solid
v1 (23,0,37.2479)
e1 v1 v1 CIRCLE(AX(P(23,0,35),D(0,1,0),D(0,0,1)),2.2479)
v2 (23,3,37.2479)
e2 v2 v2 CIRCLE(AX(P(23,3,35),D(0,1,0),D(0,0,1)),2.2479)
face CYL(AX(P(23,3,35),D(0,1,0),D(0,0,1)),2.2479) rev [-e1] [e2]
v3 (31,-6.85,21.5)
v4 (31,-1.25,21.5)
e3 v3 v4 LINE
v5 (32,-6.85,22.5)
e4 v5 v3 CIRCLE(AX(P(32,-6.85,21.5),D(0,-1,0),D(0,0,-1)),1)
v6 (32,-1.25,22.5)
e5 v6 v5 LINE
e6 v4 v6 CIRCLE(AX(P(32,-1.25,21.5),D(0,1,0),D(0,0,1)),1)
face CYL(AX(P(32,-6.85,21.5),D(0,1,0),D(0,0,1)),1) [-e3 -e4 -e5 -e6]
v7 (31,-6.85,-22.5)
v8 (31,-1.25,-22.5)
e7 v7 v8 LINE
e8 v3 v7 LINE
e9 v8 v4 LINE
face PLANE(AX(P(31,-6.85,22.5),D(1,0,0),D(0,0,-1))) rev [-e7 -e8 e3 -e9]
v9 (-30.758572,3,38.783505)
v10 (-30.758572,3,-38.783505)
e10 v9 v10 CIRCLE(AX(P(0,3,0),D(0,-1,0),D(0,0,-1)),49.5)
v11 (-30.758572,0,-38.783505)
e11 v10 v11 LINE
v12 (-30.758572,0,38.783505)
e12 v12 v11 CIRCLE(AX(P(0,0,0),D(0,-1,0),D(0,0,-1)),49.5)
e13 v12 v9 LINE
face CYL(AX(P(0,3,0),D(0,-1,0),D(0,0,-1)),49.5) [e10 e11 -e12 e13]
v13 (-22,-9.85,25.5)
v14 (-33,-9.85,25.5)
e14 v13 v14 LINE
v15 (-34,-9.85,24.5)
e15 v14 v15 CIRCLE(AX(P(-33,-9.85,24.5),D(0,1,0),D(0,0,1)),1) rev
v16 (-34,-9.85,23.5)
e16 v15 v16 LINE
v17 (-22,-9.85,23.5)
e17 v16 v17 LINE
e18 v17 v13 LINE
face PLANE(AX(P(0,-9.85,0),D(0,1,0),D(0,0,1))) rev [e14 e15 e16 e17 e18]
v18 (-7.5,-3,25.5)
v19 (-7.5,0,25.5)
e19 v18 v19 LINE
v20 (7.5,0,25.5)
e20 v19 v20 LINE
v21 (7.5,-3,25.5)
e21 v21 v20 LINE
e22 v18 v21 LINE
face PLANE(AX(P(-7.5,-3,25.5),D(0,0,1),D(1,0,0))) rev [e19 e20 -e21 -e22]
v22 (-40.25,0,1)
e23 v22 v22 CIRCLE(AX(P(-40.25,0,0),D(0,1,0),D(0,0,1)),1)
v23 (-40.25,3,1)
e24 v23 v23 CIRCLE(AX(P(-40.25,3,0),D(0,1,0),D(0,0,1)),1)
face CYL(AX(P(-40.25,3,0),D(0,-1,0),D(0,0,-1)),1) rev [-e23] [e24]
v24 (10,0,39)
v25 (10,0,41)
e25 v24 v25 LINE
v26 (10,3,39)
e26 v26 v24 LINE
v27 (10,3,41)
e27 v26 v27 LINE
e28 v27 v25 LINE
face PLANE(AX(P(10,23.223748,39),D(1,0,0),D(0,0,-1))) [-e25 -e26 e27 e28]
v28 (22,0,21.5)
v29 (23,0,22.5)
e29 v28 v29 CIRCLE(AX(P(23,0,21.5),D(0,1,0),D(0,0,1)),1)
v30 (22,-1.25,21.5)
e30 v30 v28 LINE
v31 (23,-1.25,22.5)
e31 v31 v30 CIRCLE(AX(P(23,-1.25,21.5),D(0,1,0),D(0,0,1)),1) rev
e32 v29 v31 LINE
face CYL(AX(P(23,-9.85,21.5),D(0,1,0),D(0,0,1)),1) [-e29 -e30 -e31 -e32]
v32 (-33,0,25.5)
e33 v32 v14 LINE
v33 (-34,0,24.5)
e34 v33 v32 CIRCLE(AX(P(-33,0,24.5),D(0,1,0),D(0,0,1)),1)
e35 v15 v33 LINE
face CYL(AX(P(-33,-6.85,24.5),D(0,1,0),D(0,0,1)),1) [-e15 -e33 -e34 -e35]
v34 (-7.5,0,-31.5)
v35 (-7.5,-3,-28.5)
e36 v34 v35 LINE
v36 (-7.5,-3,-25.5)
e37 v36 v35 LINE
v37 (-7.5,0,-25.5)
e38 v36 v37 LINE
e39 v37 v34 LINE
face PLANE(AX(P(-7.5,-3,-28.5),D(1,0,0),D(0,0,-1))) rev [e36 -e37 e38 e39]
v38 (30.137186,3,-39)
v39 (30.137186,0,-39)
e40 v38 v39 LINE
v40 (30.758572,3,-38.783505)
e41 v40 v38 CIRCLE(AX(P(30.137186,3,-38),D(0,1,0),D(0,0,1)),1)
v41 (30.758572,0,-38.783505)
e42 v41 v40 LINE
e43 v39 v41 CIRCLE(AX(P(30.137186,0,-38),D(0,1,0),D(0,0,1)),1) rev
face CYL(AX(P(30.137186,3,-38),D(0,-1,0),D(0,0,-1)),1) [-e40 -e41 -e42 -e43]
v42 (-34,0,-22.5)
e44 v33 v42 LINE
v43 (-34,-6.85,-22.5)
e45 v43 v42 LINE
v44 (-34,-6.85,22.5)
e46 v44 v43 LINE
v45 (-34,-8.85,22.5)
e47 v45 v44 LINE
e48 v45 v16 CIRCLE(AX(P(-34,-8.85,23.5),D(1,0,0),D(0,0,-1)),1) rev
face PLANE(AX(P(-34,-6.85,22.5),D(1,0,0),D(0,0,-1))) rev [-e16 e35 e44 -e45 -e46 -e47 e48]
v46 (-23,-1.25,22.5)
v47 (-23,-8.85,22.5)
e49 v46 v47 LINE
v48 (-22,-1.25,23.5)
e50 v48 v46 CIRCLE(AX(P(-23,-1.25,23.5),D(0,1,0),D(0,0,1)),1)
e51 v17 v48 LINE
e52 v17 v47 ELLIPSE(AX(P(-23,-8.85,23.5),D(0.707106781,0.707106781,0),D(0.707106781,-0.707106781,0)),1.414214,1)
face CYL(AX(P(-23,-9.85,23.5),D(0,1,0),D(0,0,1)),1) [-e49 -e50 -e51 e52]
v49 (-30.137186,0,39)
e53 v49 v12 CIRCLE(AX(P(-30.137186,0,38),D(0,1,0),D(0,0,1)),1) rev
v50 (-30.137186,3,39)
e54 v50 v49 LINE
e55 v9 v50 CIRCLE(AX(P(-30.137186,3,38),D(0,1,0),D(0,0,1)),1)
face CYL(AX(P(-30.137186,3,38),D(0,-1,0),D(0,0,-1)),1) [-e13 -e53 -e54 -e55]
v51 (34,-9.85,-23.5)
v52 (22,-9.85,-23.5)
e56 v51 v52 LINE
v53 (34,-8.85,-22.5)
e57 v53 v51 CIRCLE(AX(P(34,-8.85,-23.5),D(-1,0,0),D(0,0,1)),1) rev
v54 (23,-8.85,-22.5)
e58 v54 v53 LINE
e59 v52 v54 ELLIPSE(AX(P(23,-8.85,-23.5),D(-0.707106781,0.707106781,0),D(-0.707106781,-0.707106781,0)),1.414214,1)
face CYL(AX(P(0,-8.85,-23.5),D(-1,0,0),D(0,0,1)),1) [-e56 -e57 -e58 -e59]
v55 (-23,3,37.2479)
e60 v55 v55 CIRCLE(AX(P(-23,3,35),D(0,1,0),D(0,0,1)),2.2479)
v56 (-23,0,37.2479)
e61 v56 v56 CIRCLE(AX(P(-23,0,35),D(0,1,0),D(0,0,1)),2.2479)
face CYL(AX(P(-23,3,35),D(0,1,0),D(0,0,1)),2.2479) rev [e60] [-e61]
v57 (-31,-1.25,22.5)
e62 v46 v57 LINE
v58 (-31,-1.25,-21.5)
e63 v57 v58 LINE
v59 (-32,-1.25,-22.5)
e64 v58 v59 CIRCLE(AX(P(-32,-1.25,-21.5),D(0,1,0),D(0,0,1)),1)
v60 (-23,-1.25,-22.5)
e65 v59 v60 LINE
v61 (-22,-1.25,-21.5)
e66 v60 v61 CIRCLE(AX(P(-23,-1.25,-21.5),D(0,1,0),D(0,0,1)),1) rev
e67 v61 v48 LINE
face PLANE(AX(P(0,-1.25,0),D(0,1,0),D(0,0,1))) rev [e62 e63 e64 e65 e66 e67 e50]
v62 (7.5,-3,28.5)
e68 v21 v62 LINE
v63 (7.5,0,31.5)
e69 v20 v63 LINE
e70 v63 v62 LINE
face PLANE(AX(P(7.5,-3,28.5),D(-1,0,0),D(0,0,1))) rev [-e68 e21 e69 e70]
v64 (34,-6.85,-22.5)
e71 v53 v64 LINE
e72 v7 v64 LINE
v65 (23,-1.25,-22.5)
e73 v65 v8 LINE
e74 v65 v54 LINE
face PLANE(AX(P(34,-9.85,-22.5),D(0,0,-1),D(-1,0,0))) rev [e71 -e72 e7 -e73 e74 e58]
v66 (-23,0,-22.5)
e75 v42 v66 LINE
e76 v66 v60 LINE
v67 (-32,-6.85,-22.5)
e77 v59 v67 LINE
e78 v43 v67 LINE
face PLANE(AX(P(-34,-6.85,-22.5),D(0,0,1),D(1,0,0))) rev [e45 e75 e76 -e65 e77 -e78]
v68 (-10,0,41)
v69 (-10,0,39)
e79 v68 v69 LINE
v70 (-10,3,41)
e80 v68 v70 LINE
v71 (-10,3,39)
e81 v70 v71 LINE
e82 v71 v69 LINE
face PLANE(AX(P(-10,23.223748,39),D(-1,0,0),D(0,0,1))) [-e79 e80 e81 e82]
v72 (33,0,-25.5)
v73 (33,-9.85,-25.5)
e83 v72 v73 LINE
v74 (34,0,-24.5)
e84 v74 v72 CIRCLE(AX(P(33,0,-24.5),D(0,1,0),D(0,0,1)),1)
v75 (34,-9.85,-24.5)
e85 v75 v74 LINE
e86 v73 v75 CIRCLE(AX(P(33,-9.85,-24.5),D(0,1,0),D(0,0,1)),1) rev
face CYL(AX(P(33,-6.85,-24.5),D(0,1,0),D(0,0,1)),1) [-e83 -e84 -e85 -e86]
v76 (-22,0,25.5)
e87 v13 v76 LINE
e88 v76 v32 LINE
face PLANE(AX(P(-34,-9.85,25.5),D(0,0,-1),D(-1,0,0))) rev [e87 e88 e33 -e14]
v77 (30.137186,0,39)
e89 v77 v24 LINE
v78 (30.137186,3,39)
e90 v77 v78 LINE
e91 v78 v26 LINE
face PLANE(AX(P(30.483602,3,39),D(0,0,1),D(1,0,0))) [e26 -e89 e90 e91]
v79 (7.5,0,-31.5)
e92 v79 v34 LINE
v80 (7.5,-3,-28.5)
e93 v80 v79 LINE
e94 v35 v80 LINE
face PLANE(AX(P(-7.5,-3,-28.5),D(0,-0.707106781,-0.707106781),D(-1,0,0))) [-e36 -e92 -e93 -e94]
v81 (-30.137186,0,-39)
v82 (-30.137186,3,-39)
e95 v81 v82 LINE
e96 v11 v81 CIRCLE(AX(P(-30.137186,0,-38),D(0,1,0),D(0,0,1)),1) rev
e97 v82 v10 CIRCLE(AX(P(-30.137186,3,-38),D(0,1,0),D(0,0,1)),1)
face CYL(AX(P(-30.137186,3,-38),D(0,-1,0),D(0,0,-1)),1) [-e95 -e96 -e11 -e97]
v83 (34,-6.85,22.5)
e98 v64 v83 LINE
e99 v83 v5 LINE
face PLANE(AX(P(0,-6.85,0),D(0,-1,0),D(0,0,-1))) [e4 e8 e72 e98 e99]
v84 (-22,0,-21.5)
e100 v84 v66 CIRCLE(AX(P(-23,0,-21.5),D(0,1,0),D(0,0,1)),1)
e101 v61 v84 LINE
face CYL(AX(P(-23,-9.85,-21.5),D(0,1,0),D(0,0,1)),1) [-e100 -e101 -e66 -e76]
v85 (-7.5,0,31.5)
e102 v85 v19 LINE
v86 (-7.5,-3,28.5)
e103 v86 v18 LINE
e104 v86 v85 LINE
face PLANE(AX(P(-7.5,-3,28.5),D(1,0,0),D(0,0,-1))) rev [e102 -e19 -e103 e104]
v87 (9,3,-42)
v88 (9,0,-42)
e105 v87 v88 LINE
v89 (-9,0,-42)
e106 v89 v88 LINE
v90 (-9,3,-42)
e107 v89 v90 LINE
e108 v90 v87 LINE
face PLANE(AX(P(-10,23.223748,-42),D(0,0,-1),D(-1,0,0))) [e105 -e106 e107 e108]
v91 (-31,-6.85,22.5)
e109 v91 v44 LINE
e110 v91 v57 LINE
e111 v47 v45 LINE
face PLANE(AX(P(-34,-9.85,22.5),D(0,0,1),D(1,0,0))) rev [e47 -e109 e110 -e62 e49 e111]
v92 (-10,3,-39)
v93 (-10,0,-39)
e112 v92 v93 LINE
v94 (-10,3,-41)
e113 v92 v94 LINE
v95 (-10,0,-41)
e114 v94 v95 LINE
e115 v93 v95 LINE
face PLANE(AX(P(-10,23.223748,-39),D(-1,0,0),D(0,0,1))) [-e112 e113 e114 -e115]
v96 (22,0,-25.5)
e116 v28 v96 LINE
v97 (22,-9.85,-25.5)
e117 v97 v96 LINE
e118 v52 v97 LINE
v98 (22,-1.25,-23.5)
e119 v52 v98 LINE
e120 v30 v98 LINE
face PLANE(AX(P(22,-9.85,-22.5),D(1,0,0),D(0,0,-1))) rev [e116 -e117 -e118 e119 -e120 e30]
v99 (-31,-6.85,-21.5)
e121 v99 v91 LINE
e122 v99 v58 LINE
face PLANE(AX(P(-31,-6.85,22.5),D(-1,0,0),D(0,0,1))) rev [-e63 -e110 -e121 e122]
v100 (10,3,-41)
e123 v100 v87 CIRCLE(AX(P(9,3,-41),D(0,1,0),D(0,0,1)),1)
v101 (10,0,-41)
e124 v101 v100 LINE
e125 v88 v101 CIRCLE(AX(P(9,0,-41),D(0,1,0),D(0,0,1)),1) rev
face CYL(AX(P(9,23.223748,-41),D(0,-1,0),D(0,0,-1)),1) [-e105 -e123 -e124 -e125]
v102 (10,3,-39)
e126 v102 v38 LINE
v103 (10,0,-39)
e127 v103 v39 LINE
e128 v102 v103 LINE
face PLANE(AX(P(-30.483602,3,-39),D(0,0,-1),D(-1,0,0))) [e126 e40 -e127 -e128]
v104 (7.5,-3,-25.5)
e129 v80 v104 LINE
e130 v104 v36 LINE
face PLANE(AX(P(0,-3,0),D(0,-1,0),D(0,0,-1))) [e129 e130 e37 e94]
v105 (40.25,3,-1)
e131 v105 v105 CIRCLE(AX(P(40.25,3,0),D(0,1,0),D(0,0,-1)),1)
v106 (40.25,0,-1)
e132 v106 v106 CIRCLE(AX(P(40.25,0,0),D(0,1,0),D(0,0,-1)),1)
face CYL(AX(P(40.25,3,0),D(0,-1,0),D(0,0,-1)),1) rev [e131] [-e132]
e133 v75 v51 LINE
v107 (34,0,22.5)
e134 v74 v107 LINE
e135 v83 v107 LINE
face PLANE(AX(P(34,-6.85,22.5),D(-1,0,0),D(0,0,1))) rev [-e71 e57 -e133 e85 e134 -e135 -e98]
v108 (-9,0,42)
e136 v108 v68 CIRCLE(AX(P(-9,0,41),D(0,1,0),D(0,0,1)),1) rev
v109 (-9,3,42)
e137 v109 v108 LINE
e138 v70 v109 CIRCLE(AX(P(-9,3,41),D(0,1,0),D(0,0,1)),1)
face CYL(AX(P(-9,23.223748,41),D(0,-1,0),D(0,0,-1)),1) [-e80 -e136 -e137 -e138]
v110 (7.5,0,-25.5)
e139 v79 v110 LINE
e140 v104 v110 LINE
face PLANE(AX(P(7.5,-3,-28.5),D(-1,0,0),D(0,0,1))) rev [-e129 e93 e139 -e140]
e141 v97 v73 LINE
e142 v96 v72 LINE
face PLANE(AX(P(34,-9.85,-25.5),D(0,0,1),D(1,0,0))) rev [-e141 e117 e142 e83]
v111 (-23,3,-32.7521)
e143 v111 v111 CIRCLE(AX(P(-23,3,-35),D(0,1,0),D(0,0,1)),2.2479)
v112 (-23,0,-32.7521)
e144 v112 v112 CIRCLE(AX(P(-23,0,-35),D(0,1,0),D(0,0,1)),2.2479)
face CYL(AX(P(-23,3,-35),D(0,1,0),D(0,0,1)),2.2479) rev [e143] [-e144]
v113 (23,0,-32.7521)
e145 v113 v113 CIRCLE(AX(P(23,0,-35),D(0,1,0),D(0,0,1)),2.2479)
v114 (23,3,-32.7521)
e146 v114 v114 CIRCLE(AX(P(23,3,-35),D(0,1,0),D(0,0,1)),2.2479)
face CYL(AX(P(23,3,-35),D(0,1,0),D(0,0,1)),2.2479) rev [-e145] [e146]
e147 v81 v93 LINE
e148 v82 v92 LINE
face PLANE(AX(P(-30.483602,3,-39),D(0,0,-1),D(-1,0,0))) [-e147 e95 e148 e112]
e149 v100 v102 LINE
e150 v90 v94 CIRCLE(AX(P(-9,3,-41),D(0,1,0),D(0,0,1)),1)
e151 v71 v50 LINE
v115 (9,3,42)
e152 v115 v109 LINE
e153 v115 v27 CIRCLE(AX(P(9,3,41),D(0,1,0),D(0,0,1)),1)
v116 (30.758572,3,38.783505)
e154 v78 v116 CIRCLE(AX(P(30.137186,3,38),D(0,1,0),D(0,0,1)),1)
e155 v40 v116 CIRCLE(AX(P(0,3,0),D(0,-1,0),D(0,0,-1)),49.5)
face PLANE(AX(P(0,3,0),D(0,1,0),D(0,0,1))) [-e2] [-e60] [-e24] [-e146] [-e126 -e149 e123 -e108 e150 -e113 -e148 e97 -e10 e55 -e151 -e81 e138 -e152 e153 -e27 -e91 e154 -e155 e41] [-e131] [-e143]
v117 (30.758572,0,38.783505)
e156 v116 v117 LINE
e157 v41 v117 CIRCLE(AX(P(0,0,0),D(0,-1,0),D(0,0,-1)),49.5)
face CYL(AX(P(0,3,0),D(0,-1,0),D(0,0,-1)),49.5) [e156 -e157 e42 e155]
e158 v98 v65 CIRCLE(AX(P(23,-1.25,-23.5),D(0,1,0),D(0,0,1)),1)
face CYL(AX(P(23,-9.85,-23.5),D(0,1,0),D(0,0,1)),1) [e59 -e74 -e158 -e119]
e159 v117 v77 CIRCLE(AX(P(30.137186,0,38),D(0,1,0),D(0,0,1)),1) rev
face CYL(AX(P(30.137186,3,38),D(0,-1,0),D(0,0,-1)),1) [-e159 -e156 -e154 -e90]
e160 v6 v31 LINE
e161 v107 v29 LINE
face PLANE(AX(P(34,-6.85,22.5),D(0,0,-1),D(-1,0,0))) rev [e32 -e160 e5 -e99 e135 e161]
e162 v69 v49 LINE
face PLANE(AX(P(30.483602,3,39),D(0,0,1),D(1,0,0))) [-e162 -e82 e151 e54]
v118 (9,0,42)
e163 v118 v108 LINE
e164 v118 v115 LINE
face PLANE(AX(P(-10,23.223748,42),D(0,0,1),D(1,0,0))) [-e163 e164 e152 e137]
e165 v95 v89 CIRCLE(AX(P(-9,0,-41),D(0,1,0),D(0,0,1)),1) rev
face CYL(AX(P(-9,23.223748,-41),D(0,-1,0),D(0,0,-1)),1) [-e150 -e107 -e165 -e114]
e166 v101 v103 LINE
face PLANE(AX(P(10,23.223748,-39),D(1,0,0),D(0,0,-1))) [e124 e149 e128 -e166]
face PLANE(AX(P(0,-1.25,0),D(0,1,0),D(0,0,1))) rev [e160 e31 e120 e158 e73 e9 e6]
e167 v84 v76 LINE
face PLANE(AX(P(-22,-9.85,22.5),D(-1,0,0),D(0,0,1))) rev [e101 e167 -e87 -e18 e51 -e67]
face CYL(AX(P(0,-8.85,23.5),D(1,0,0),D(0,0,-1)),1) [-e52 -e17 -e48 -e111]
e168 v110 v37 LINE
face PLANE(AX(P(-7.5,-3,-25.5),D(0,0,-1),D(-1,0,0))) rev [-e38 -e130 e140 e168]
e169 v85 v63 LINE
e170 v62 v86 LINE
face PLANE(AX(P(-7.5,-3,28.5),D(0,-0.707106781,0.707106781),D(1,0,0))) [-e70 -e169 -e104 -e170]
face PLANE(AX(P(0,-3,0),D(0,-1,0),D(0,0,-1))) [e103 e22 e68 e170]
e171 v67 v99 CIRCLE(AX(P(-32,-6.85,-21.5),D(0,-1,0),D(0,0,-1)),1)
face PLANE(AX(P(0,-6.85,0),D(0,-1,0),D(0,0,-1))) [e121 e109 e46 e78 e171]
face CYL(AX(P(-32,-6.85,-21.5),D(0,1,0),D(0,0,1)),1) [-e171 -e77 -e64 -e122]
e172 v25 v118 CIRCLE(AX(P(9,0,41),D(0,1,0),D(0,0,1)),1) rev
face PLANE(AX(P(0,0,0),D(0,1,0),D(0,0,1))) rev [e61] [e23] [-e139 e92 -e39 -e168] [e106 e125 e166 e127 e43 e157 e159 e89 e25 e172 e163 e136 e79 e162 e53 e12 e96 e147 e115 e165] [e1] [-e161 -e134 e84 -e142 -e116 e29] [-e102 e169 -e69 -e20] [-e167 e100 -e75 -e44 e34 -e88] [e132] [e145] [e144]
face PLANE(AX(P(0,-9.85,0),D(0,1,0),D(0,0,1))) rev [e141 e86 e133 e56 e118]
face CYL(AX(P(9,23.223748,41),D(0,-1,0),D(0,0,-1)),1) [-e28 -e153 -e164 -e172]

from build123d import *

# Parameters (mm, degrees)
A_BASE_T42_OUTLINE_R              = 2.2479
A_BASE_T42_OUTLINE_R_2            = 1
A_BASE_T42_DEPTH                  = 3
OUTER_RIM_CUT_DEPTH               = 68.299702823
SKETCH2_W                         = 20
SKETCH2_H                         = 3
FLANGES_DEPTH                     = 3
CONTOURING_R                      = 1
SKETCH3_W                         = 15
SKETCH3_H                         = 3
BASE_SUPPORTS_DEPTH               = 3
BASE_SUPPORTS_CHAMFER_SIZE        = 3
SKETCH4_W                         = 3
SKETCH4_H                         = 45
DYNAMIXEL_SIDE_SUPPORTS_DEPTH     = 6.85
SKETCH5_W                         = 12
SKETCH5_H                         = 3
DYNAMIXEL_SIDE_SUPPORT_ENDS_DEPTH = 9.85
SKETCH8_W                         = 9
SKETCH8_H                         = 45
DYNAMIXEL_OFFSET_DEPTH            = 1.25
DYNAMIXEL_CONTOURING_R            = 1


# Read off the part's stored shape, not the designer's step: a_base_t42
with BuildPart() as part:
    # a_base_t42 outline → a_base_t42 (new body)
    with BuildSketch(Plane(origin=(0, 0, 0), x_dir=(1, 0, 0), z_dir=(0, 1, 0))):
        with BuildLine():
            ThreePointArc((31.5, -42), (52.5, 0), (31.5, 42))
            Line((31.5, 42), (-31.5, 42))
            ThreePointArc((-31.5, 42), (-52.5, 0), (-31.5, -42))
            Line((-31.5, -42), (31.5, -42))
        make_face()
        with Locations((-23, -35)):
            Circle(A_BASE_T42_OUTLINE_R, mode=Mode.SUBTRACT)
        with Locations((23, -35)):
            Circle(A_BASE_T42_OUTLINE_R, mode=Mode.SUBTRACT)
        with Locations((-40.25, 0)):
            Circle(A_BASE_T42_OUTLINE_R_2, mode=Mode.SUBTRACT)
        with Locations((-23, 35)):
            Circle(A_BASE_T42_OUTLINE_R, mode=Mode.SUBTRACT)
        with Locations((40.25, 0)):
            Circle(A_BASE_T42_OUTLINE_R_2, mode=Mode.SUBTRACT)
        with Locations((23, 35)):
            Circle(A_BASE_T42_OUTLINE_R, mode=Mode.SUBTRACT)
    extrude(amount=A_BASE_T42_DEPTH)

    # Sketch1 → Outer Rim Cut (cut, through all)
    with BuildSketch(Plane.XZ):
        with BuildLine():
            Line((31.5, 42), (-31.5, 42))
            ThreePointArc((-31.5, 42), (-52.5, 0), (-31.5, -42))
            Line((-31.5, -42), (31.5, -42))
            ThreePointArc((31.5, -42), (52.5, 0), (31.5, 42))
        make_face()
        with BuildLine():
            Line((30.483602149, 39), (-30.483602149, 39))
            ThreePointArc((-30.483602149, 39), (-49.5, 0), (-30.483602149, -39))
            Line((-30.483602149, -39), (30.483602149, -39))
            ThreePointArc((30.483602149, -39), (49.5, 0), (30.483602149, 39))
        make_face(mode=Mode.SUBTRACT)
    extrude(amount=-OUTER_RIM_CUT_DEPTH, mode=Mode.SUBTRACT)

    # Sketch2 → Flanges (add)
    with BuildSketch(Plane.XZ):
        with Locations((0, -40.5)):
            Rectangle(SKETCH2_W, SKETCH2_H)
        with Locations((0, 40.5)):
            Rectangle(SKETCH2_W, SKETCH2_H)
    extrude(amount=-FLANGES_DEPTH)

    # Contouring
    contouring_edges = [part.edges().sort_by_distance(p)[0] for p in [
        (30.483602149, 1.5, -39),
        (-30.483602149, 1.5, -39),
        (10, 1.5, -42),
        (-10, 1.5, -42),
        (30.483602149, 1.5, 39),
        (-30.483602149, 1.5, 39),
        (10, 1.5, 42),
        (-10, 1.5, 42),
    ]]
    fillet(contouring_edges, radius=CONTOURING_R)

    # Sketch3 → Base Supports (add)
    with BuildSketch(Plane.XZ):
        with Locations((0, -27)):
            Rectangle(SKETCH3_W, SKETCH3_H)
        with Locations((0, 27)):
            Rectangle(SKETCH3_W, SKETCH3_H)
    extrude(amount=BASE_SUPPORTS_DEPTH)

    # Base Supports Chamfer
    base_supports_chamfer_edges = [part.edges().sort_by_distance(p)[0] for p in [
        (0, 0, 28.5),
        (0, 0, -28.5),
    ]]
    chamfer(base_supports_chamfer_edges, length=BASE_SUPPORTS_CHAMFER_SIZE - 0.0001)  # a hair under: the kernel refuses the full size

    # Sketch4 → Dynamixel Side Supports (add)
    with BuildSketch(Plane.XZ):
        with Locations((-32.5, 0)):
            Rectangle(SKETCH4_W, SKETCH4_H)
        with Locations((32.5, 0)):
            Rectangle(SKETCH4_W, SKETCH4_H)
    extrude(amount=DYNAMIXEL_SIDE_SUPPORTS_DEPTH)

    # Sketch5 → Dynamixel Side Support Ends (add)
    with BuildSketch(Plane.XZ):
        with Locations((-28, 24)):
            Rectangle(SKETCH5_W, SKETCH5_H)
        with Locations((28, -24)):
            Rectangle(SKETCH5_W, SKETCH5_H)
    extrude(amount=DYNAMIXEL_SIDE_SUPPORT_ENDS_DEPTH)

    # Sketch8 → Dynamixel Offset (add)
    with BuildSketch(Plane.XZ):
        with Locations((-26.5, 0)):
            Rectangle(SKETCH8_W, SKETCH8_H)
        with Locations((26.5, 0)):
            Rectangle(SKETCH8_W, SKETCH8_H)
    extrude(amount=DYNAMIXEL_OFFSET_DEPTH)

    # Dynamixel Contouring
    dynamixel_contouring_edges = [part.edges().sort_by_distance(p)[0] for p in [
        (-31, -4.05, -22.5),
        (31, -4.05, 22.5),
        (-34, -4.925, 25.5),
        (-22, -5.55, 22.5),
        (-28, -9.85, 22.5),
        (34, -4.925, -25.5),
        (22, -5.55, -22.5),
        (28, -9.85, -22.5),
        (-22, -0.625, -22.5),
        (22, -0.625, 22.5),
    ]]
    fillet(dynamixel_contouring_edges, radius=DYNAMIXEL_CONTOURING_R)


solid = part.part
